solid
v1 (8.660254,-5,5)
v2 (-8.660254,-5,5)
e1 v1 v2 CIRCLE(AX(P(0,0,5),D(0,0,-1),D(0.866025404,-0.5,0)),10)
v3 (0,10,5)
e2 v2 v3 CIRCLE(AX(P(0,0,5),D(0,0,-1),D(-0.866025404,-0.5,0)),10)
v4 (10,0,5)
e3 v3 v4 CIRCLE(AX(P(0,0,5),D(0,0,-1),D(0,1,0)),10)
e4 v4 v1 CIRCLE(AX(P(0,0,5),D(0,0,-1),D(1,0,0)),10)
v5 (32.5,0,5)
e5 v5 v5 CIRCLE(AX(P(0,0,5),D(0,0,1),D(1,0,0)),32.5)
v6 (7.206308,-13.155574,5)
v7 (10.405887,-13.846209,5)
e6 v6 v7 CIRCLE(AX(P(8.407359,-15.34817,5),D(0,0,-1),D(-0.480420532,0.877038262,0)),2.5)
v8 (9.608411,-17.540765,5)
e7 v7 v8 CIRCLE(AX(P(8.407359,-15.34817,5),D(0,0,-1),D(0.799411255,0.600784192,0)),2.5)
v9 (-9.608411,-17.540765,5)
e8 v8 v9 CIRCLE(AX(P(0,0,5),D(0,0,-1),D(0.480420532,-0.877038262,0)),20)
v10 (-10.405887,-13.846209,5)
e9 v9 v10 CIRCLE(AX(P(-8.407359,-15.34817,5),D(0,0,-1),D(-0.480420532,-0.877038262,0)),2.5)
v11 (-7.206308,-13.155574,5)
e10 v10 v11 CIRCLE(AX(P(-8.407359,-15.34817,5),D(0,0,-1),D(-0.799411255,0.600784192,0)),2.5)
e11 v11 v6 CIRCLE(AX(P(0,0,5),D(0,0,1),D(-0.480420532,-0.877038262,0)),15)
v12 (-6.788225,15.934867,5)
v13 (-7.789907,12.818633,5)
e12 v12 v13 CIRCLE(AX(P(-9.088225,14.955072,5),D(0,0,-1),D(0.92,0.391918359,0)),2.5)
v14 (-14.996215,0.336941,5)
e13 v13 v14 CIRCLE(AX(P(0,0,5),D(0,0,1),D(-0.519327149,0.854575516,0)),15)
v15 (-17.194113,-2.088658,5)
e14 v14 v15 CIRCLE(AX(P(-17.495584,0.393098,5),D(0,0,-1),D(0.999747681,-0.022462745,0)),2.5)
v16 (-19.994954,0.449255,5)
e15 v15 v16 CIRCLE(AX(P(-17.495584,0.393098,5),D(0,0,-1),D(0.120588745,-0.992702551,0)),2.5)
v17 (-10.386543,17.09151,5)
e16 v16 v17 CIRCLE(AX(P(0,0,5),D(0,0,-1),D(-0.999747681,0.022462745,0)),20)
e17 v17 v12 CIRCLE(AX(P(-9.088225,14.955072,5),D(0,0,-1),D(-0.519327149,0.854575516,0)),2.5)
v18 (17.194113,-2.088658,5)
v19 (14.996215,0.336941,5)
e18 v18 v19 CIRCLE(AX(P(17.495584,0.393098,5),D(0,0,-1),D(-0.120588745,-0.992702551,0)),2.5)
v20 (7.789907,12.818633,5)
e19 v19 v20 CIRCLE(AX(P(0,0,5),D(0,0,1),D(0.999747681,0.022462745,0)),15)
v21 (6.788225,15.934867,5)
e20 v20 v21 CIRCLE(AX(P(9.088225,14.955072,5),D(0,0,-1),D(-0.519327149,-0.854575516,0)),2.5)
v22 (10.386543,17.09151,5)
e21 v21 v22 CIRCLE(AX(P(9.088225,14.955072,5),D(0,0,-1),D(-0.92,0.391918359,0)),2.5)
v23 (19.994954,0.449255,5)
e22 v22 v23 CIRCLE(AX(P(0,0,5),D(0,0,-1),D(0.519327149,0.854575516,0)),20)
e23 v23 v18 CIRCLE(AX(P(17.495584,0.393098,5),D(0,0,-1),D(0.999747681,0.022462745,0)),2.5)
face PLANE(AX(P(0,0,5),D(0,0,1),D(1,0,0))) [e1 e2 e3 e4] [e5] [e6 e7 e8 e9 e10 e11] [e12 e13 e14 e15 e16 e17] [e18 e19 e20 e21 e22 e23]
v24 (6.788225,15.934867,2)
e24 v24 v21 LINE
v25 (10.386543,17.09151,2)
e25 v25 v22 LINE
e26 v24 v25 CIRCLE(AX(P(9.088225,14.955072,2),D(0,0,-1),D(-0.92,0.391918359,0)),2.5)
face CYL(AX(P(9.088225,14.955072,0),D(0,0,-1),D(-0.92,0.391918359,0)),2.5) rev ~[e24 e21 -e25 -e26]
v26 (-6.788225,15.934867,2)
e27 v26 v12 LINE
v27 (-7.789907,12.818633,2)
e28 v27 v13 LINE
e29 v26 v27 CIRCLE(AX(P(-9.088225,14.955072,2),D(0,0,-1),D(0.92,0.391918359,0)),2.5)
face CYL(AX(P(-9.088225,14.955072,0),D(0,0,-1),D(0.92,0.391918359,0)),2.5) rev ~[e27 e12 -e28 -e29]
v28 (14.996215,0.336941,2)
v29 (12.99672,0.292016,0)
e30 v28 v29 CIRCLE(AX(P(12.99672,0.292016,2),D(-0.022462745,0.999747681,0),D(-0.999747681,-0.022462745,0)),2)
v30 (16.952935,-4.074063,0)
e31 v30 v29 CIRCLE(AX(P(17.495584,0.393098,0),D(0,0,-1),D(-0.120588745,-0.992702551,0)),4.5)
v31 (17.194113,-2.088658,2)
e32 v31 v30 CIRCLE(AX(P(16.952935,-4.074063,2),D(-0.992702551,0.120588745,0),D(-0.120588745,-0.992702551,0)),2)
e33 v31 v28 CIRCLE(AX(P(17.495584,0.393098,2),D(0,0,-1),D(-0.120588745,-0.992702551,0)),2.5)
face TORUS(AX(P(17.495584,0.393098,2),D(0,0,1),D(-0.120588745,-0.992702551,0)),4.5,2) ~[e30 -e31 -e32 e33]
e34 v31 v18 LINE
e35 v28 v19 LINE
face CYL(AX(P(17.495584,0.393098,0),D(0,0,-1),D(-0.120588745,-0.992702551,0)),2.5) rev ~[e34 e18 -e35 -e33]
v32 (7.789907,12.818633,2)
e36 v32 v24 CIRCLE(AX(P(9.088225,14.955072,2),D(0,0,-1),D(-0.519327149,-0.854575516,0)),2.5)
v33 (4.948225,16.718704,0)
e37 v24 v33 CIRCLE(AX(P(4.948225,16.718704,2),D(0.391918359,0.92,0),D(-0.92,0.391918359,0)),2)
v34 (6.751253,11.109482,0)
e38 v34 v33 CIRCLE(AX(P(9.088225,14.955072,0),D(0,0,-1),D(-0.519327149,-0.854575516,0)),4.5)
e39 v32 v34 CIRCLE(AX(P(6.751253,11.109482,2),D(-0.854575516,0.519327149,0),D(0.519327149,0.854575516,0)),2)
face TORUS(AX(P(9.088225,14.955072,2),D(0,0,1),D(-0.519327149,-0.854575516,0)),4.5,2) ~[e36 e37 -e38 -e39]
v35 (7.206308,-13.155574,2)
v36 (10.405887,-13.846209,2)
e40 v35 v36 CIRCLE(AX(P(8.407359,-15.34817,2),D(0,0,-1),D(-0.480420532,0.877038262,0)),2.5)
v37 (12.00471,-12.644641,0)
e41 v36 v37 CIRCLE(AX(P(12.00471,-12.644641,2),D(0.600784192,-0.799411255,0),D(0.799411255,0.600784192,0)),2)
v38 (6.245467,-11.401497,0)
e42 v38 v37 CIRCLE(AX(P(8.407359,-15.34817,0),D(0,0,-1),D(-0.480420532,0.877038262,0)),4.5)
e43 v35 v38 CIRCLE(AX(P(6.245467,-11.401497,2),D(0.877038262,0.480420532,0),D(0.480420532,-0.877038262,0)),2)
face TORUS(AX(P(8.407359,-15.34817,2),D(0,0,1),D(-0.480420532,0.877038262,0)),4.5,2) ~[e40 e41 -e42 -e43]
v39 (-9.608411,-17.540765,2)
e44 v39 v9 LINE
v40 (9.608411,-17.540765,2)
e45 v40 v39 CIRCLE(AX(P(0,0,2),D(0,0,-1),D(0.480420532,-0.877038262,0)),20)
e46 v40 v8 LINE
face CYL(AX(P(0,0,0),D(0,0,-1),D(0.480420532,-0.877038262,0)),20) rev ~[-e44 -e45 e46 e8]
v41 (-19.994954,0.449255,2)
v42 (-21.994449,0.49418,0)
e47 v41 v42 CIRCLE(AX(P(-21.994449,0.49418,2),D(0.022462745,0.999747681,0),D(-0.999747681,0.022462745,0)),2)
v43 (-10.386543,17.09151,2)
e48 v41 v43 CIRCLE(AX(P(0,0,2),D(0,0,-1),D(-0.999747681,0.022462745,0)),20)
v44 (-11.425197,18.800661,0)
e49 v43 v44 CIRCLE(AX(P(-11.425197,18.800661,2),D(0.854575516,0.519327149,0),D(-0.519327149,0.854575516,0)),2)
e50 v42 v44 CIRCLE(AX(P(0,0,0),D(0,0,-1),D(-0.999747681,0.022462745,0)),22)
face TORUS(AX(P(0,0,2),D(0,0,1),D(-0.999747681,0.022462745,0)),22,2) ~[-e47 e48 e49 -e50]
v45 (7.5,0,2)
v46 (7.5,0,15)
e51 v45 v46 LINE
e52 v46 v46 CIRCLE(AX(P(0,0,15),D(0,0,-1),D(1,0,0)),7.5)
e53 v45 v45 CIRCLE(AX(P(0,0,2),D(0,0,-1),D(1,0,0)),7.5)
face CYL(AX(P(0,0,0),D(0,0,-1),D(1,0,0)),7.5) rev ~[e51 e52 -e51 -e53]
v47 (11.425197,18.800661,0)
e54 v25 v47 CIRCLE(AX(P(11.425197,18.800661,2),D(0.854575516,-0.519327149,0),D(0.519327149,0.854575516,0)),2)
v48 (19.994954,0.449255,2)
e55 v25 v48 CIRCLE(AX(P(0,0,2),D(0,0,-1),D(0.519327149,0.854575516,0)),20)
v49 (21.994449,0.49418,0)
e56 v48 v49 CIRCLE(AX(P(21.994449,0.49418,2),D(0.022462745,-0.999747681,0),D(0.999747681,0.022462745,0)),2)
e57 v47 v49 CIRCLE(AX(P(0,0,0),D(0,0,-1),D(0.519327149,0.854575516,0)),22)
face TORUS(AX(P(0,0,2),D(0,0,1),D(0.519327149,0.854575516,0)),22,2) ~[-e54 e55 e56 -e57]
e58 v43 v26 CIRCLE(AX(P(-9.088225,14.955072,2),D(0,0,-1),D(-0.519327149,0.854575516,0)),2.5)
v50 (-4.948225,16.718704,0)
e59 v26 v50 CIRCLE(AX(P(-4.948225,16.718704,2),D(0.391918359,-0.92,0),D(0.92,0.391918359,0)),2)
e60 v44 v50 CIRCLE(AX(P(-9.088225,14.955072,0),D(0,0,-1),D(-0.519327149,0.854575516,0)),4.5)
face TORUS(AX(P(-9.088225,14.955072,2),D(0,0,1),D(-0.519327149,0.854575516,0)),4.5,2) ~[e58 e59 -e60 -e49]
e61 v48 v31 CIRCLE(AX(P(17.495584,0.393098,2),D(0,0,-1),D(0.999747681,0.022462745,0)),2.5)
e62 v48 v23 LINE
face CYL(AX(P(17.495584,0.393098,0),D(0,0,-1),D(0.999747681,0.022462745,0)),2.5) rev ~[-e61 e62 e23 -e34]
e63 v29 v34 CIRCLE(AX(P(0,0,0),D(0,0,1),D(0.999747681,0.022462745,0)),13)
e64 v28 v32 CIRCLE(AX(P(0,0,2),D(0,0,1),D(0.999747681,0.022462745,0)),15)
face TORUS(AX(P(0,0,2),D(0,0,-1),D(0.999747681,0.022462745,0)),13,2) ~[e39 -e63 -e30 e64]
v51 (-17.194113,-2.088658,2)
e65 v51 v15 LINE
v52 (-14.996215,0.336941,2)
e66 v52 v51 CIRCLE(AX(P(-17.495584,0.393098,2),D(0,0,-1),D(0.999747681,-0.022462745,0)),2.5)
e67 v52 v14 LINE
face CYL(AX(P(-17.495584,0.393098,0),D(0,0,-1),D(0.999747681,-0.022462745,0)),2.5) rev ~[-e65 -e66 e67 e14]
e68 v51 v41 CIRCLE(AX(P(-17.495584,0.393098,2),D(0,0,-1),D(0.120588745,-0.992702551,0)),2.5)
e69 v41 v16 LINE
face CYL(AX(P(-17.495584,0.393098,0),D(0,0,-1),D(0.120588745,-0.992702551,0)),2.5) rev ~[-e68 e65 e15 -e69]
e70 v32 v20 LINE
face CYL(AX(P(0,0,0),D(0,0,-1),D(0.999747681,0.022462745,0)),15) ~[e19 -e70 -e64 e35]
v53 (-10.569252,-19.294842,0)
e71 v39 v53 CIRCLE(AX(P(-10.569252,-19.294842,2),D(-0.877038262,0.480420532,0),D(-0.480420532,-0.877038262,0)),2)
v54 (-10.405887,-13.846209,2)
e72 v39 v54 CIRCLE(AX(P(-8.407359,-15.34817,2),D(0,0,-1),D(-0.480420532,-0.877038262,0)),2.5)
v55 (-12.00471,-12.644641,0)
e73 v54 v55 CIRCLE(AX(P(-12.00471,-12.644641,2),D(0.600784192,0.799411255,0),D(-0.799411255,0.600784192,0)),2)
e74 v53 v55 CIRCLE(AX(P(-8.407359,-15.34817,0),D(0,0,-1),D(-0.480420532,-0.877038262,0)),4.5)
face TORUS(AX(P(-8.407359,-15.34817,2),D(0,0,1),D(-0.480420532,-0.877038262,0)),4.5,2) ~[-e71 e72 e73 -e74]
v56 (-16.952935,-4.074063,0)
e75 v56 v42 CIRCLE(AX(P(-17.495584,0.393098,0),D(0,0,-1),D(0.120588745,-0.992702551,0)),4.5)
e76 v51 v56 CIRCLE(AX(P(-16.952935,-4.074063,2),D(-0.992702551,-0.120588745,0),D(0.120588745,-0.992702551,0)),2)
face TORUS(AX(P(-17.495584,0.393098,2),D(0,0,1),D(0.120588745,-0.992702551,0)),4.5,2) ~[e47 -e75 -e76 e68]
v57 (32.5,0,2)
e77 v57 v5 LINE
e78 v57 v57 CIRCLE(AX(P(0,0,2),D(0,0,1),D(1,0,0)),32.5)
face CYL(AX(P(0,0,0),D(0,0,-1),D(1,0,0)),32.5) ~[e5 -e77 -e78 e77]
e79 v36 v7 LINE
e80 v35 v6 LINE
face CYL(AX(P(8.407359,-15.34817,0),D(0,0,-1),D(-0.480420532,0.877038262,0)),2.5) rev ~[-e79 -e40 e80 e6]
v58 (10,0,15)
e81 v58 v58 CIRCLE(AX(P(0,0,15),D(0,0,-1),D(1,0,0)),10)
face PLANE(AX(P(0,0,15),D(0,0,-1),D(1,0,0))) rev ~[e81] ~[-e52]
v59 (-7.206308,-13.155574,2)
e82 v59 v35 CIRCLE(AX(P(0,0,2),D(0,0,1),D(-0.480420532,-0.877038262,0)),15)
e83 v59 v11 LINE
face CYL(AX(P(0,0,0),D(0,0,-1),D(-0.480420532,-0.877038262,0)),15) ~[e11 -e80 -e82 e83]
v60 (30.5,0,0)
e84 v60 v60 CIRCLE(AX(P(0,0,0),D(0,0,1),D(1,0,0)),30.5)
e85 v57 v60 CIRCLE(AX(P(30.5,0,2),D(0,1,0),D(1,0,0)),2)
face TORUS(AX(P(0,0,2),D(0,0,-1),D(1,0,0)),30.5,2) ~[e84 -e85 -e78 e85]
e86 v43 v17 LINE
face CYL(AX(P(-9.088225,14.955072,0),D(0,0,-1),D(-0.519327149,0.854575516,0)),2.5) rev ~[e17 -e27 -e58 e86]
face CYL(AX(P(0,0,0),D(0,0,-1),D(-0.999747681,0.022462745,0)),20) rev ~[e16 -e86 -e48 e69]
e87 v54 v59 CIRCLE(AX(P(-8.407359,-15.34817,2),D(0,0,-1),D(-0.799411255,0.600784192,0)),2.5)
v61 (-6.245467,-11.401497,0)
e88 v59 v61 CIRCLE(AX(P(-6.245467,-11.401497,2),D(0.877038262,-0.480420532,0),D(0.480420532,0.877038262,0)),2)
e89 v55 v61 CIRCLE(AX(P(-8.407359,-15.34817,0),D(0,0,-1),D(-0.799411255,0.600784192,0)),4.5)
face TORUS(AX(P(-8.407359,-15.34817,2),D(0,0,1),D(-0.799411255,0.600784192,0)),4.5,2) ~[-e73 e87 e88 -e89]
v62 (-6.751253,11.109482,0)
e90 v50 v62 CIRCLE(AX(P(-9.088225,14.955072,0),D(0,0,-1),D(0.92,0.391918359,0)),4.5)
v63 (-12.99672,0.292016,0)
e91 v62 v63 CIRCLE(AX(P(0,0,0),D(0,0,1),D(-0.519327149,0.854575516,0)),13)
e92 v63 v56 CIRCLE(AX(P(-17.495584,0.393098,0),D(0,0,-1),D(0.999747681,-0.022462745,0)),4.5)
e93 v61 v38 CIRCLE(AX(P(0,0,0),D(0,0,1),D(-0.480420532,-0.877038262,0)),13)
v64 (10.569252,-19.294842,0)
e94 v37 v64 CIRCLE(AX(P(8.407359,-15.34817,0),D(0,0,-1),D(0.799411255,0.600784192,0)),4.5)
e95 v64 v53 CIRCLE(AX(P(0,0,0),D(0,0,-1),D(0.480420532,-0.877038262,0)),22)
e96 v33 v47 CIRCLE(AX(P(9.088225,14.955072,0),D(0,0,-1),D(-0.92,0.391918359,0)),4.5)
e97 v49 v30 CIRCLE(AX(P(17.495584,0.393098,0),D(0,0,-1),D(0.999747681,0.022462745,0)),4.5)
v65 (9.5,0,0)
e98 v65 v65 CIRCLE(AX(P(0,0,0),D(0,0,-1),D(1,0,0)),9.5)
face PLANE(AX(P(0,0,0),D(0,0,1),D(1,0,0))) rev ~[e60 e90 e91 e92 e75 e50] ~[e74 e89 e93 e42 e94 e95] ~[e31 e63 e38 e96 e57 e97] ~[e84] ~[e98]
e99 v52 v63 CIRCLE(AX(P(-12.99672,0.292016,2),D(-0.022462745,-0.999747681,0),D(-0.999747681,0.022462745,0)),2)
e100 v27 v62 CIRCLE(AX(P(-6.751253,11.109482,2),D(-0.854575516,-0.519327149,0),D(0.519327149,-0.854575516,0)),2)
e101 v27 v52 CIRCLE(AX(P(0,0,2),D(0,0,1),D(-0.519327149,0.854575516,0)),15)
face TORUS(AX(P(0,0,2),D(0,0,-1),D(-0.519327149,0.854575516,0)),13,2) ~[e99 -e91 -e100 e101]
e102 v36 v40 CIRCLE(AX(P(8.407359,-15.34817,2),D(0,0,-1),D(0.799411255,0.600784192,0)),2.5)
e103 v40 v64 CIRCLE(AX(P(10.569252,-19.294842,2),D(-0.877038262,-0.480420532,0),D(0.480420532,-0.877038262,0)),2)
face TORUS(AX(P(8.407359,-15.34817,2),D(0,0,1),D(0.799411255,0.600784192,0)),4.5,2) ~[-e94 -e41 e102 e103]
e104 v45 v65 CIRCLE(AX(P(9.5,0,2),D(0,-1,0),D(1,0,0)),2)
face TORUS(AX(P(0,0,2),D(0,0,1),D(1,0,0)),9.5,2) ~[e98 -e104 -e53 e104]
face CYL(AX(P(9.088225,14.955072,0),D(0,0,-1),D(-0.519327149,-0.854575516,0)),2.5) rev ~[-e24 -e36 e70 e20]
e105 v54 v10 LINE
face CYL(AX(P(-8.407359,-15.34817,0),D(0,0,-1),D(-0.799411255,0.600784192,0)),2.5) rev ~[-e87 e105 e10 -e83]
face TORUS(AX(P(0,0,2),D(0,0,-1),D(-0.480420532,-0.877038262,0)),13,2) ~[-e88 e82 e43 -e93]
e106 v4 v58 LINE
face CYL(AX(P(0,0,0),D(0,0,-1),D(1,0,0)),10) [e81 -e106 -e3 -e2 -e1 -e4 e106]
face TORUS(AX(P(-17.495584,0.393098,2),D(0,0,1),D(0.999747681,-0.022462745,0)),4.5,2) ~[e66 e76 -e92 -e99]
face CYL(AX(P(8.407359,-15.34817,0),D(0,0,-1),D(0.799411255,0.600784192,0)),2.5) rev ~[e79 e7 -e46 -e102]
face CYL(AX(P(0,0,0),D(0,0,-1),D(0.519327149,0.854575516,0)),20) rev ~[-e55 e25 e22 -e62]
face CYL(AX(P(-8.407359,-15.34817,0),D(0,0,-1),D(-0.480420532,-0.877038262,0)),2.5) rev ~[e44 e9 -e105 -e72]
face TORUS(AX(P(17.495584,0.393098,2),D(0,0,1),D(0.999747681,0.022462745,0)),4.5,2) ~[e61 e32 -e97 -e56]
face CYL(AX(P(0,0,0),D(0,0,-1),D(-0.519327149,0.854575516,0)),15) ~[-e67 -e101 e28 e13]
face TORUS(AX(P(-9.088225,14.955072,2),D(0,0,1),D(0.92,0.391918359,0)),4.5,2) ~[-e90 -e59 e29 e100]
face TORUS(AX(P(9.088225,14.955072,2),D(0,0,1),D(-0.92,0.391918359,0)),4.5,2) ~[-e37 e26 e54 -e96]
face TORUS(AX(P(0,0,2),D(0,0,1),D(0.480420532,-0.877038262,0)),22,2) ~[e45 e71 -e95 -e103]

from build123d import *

# Parameters (mm, degrees)
F0_R     = 32.5
F1_DEPTH = 5
F2_R     = 10
F2_R_2   = 7.5
F3_DEPTH = 15
F4_R     = 2


with BuildPart() as f1:
    # F0 (on Top) → F1 (new body)
    with BuildSketch(Plane.XY):
        Circle(F0_R)
        with BuildLine():
            ThreePointArc((-9.6084106433, -17.5407652316), (-10.8510784968, -15.8756509046), (-10.4058874503, -13.8462090975))
            ThreePointArc((-10.4058874503, -13.8462090975), (-8.9348406398, -12.9044503937), (-7.2063079825, -13.1555739237))
            ThreePointArc((-7.2063079825, -13.1555739237), (0, -15), (7.2063079825, -13.1555739237))
            ThreePointArc((7.2063079825, -13.1555739237), (8.9348406398, -12.9044503937), (10.4058874503, -13.8462090975))
            ThreePointArc((10.4058874503, -13.8462090975), (10.8510784968, -15.8756509046), (9.6084106433, -17.5407652316))
            ThreePointArc((9.6084106433, -17.5407652316), (0, -20), (-9.6084106433, -17.5407652316))
        make_face(mode=Mode.SUBTRACT)
        with BuildLine():
            ThreePointArc((-19.994953614, 0.4492549087), (-17.3205080757, 10), (-10.3865429707, 17.0915103229))
            ThreePointArc((-10.3865429707, 17.0915103229), (-8.3231777366, 17.335135089), (-6.7882250994, 15.9348674296))
            ThreePointArc((-6.7882250994, 15.9348674296), (-6.708161543, 14.1900241697), (-7.789907228, 12.8186327422))
            ThreePointArc((-7.789907228, 12.8186327422), (-12.9903810568, 7.5), (-14.9962152105, 0.3369411815))
            ThreePointArc((-14.9962152105, 0.3369411815), (-15.6430021828, -1.285573776), (-17.1941125497, -2.0886583321))
            ThreePointArc((-17.1941125497, -2.0886583321), (-19.1742562334, -1.4594841844), (-19.994953614, 0.4492549087))
        make_face(mode=Mode.SUBTRACT)
        with BuildLine():
            ThreePointArc((0, 10), (7.0710678119, 7.0710678119), (10, 0))
            ThreePointArc((10, 0), (9.6592582629, -2.588190451), (8.6602540378, -5))
            ThreePointArc((8.6602540378, -5), (0, -10), (-8.6602540378, -5))
            ThreePointArc((-8.6602540378, -5), (-8.6602540378, 5), (0, 10))
        make_face(mode=Mode.SUBTRACT)
        with BuildLine():
            ThreePointArc((19.994953614, 0.4492549087), (19.1742562334, -1.4594841844), (17.1941125497, -2.0886583321))
            ThreePointArc((17.1941125497, -2.0886583321), (15.6430021828, -1.285573776), (14.9962152105, 0.3369411815))
            ThreePointArc((14.9962152105, 0.3369411815), (12.9903810568, 7.5), (7.789907228, 12.8186327422))
            ThreePointArc((7.789907228, 12.8186327422), (6.708161543, 14.1900241697), (6.7882250994, 15.9348674296))
            ThreePointArc((6.7882250994, 15.9348674296), (8.3231777366, 17.335135089), (10.3865429707, 17.0915103229))
            ThreePointArc((10.3865429707, 17.0915103229), (17.3205080757, 10), (19.994953614, 0.4492549087))
        make_face(mode=Mode.SUBTRACT)
    extrude(amount=F1_DEPTH)

    # F2 (on face) → F3 (join)
    with BuildSketch(Plane(origin=(0, 0, 0), x_dir=(1, 0, 0), z_dir=(0, 0, -1))):
        Circle(F2_R)
        Circle(F2_R_2, mode=Mode.SUBTRACT)
    extrude(amount=-F3_DEPTH)

    # F4
    f4_edges = [f1.edges().sort_by_distance(p)[0] for p in [
        (-32.5, 0, 0),
        (-10.599955, -14.147118, 0),
        (0, -15, 0),
        (10.599955, -14.147118, 0),
        (0, -20, 0),
        (-17.551741, -2.106271, 0),
        (-17.320508, 10, 0),
        (-6.951786, 16.253389, 0),
        (-12.990381, 7.5, 0),
        (17.320508, 10, 0),
        (17.551741, -2.106271, 0),
        (12.990381, 7.5, 0),
        (6.951786, 16.253389, 0),
        (-7.5, 0, 0),
    ]]
    fillet(f4_edges, radius=F4_R)


solid = f1.part
